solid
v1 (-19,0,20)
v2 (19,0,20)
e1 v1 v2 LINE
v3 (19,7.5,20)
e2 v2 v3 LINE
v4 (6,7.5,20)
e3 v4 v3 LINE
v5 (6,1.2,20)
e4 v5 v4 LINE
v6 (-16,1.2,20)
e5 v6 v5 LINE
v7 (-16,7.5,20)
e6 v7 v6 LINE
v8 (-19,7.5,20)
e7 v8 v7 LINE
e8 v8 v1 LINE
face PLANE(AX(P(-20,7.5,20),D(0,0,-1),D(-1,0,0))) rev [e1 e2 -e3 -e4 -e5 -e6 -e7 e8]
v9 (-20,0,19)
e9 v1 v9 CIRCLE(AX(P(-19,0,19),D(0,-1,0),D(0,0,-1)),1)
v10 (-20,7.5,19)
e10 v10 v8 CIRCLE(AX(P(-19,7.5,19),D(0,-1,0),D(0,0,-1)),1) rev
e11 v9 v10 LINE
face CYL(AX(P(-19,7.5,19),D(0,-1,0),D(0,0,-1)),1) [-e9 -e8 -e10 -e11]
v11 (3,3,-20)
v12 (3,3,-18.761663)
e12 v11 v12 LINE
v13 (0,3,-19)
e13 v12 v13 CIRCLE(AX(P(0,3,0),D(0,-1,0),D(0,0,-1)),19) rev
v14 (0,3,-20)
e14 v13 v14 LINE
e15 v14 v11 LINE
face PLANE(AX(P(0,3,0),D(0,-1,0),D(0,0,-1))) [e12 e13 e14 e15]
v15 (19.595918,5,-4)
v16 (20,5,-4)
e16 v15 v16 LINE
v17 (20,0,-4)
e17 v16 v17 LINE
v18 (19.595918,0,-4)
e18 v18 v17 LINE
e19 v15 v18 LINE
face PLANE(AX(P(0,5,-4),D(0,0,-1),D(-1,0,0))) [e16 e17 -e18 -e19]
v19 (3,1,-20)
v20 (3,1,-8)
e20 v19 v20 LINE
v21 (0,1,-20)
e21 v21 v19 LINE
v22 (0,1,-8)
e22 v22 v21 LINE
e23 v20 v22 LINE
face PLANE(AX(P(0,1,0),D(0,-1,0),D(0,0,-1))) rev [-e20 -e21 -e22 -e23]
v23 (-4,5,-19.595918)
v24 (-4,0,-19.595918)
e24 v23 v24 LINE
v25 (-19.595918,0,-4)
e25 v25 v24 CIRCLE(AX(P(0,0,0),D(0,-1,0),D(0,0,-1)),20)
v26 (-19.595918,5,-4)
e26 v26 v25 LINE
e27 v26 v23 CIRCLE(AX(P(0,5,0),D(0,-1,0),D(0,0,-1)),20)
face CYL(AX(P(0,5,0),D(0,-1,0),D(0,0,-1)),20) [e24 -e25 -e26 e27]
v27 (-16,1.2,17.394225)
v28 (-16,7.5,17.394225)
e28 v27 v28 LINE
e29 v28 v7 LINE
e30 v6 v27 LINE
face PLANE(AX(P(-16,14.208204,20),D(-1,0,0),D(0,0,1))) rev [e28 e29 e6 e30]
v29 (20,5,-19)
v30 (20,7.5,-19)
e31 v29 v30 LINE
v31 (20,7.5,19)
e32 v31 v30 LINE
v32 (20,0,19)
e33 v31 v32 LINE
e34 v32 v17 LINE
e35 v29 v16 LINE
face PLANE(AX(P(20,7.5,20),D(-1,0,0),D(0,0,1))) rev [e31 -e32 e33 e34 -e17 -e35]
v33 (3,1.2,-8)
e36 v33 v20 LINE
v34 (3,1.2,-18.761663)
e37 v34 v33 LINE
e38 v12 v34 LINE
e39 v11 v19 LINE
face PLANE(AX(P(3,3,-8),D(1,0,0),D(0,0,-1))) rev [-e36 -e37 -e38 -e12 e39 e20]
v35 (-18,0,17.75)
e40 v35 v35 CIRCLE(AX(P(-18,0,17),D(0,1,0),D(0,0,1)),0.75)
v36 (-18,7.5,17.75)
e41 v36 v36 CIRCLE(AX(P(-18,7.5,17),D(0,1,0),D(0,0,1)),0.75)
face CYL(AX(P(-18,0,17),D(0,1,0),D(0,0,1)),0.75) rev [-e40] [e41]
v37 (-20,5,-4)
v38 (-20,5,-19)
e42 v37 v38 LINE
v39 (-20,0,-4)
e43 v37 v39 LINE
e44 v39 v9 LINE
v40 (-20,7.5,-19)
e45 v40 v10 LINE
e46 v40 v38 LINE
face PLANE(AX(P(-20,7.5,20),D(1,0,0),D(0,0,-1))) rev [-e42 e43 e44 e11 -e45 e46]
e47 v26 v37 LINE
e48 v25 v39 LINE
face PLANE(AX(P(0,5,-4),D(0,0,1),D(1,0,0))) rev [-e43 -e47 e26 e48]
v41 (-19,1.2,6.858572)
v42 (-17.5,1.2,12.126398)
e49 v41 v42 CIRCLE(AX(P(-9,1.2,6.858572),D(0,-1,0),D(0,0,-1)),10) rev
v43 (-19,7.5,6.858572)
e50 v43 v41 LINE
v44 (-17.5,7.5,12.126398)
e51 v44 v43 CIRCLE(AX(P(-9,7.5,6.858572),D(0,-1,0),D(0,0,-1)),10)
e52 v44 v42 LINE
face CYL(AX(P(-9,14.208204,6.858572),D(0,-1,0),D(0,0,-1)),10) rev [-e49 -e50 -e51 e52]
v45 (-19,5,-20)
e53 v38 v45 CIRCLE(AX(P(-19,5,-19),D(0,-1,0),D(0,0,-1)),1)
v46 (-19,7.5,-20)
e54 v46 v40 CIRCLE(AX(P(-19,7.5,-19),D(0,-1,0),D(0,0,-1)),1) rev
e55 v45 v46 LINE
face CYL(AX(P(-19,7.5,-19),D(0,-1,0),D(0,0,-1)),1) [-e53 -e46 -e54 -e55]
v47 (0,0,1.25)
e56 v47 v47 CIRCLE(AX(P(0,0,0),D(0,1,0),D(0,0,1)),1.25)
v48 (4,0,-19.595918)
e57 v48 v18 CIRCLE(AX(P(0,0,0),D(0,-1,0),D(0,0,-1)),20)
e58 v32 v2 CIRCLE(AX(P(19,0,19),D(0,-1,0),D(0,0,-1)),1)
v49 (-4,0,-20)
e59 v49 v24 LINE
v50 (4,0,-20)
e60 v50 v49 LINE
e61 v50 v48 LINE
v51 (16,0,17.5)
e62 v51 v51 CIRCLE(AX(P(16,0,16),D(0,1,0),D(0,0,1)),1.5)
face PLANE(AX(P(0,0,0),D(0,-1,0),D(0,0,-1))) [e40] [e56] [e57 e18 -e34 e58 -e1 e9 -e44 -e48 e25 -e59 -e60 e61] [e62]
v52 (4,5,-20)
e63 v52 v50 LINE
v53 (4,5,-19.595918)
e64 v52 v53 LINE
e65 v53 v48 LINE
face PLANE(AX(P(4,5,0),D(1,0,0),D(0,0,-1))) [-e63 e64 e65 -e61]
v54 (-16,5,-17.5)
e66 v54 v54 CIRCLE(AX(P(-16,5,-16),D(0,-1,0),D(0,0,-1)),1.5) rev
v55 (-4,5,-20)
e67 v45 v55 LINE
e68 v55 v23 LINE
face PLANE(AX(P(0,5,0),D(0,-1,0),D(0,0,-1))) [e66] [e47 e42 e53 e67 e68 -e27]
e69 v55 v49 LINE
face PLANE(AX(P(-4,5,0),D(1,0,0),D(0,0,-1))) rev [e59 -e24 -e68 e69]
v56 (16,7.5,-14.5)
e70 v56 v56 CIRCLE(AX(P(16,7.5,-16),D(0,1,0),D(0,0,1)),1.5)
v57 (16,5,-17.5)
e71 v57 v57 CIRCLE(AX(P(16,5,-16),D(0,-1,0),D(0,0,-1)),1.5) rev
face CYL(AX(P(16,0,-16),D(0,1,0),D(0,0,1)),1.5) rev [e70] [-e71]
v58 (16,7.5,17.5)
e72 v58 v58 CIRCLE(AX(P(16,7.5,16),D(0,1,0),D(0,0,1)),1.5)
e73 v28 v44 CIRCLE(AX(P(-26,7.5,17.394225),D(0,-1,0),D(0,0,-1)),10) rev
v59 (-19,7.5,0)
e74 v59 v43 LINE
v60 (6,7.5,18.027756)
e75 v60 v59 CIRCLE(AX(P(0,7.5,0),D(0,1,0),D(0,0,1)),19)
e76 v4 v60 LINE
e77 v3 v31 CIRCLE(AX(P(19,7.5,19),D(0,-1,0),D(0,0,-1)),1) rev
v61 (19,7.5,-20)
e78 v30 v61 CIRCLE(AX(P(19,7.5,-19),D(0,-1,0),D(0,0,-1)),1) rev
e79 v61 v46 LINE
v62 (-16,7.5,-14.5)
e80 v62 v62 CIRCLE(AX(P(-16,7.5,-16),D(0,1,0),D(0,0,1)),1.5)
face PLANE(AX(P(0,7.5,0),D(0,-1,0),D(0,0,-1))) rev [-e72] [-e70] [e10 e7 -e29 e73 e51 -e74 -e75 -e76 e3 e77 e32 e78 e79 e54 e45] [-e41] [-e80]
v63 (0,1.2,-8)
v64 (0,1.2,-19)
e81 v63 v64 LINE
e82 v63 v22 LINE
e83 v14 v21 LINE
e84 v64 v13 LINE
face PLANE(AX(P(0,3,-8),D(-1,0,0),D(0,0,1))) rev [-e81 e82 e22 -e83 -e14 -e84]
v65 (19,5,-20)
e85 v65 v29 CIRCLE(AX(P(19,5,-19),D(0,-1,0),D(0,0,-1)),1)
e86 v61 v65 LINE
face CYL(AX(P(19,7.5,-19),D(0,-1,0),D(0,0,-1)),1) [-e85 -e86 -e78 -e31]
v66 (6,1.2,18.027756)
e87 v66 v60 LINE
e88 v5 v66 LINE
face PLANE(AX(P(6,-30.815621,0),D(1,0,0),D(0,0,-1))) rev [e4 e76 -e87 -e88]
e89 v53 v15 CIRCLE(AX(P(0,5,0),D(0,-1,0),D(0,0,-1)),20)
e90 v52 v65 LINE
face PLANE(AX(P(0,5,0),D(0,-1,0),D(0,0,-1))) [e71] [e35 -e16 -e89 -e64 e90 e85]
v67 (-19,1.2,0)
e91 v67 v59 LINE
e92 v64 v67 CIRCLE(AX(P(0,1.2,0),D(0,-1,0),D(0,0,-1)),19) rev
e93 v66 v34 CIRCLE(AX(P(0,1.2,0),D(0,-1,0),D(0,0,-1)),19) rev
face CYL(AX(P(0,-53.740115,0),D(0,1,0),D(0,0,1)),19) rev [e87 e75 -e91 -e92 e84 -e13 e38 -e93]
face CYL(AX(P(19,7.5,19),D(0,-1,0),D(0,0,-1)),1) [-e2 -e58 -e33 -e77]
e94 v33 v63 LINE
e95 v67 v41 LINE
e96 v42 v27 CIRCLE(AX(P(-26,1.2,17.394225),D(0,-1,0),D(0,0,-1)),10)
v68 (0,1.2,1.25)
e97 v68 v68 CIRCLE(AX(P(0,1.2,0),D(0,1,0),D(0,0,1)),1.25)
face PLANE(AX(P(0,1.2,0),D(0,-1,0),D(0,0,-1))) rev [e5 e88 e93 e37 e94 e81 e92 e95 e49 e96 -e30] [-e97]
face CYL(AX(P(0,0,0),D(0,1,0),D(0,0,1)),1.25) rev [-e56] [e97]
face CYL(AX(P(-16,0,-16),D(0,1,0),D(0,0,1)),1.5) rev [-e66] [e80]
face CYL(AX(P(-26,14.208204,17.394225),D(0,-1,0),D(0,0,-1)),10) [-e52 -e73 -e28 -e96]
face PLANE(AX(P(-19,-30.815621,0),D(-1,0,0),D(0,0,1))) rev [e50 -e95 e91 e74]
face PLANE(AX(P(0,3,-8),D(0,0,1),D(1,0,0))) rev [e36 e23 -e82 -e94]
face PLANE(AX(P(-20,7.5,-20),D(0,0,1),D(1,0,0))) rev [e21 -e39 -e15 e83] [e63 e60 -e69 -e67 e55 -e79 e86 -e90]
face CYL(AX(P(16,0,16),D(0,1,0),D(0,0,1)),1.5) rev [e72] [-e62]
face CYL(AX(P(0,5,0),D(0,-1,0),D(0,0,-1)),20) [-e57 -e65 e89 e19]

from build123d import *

# Parameters (mm, degrees)
SKETCH1_W               = 40
SKETCH1_H               = 40
BOSS_EXTRUDE1_DEPTH     = 7.5
SKETCH2_R               = 19
CUT_EXTRUDE1_DEPTH      = 6.3
SKETCH3_W               = 25
SKETCH3_H               = 20
CUT_EXTRUDE2_DEPTH      = 6.3
SKETCH4_R               = 1.5
CUT_EXTRUDE3_DEPTH      = 30.261749777
SKETCH6_R               = 1.25
CUT_EXTRUDE5_DEPTH      = 29.977404991
SKETCH7_W               = 3
SKETCH7_H               = 6
BOSS_EXTRUDE2_DEPTH     = 6.3
FILLET1_R               = 10
FILLET2_R               = 10
SKETCH8_R               = 0.75
CUT_EXTRUDE6_DEPTH      = 30.261749777
BOSS_EXTRUDE3_DEPTH     = 5
FILLET3_R               = 1
CUT_EXTRUDE7_START      = -1
SKETCH10_W              = 3
SKETCH10_H              = 12
CUT_EXTRUDE7_DEPTH      = 2
CUT_EXTRUDE8_DEPTH      = 33.882366095
CUT_EXTRUDE8_DEPTH_BACK = 33.882366095
SKETCH11_W              = 5
SKETCH11_H              = 7.5
CUT_EXTRUDE9_START      = -5
SKETCH12_R              = 1.5
CUT_EXTRUDE9_DEPTH      = 5


with BuildPart() as part:
    # Sketch1 → Boss-Extrude1 (new body)
    with BuildSketch(Plane(origin=(0, 0, 0), x_dir=(1, 0, 0), z_dir=(0, 1, 0))):
        Rectangle(SKETCH1_W, SKETCH1_H)
    extrude(amount=BOSS_EXTRUDE1_DEPTH)

    # Sketch2 → Cut-Extrude1 (cut)
    with BuildSketch(Plane(origin=(0, 7.5, 0), x_dir=(1, 0, 0), z_dir=(0, 1, 0))):
        with Locations(Location((0, 0, 0), (0, 0, 270))):
            Circle(SKETCH2_R)
    extrude(amount=-CUT_EXTRUDE1_DEPTH, mode=Mode.SUBTRACT)

    # Sketch3 → Cut-Extrude2 (cut)
    with BuildSketch(Plane(origin=(0, 7.5, 0), x_dir=(1, 0, 0), z_dir=(0, 1, 0))):
        with Locations((-6.5, -10)):
            Rectangle(SKETCH3_W, SKETCH3_H)
    extrude(amount=-CUT_EXTRUDE2_DEPTH, mode=Mode.SUBTRACT)

    # Sketch4 → Cut-Extrude3 (cut, through all)
    with BuildSketch(Plane(origin=(0, 7.5, 0), x_dir=(1, 0, 0), z_dir=(0, 1, 0))):
        with Locations(Location((-16, 16, 0), (0, 0, 270))):
            Circle(SKETCH4_R)
        with Locations(Location((16, 16, 0), (0, 0, 270))):
            Circle(SKETCH4_R)
        with Locations(Location((16, -16, 0), (0, 0, 270))):
            Circle(SKETCH4_R)
    extrude(amount=-CUT_EXTRUDE3_DEPTH, mode=Mode.SUBTRACT)

    # Sketch6 → Cut-Extrude5 (cut, through all)
    with BuildSketch(Plane(origin=(0, 1.2, 0), x_dir=(1, 0, 0), z_dir=(0, 1, 0))):
        with Locations(Location((0, 0, 0), (0, 0, 270))):
            Circle(SKETCH6_R)
    extrude(amount=-CUT_EXTRUDE5_DEPTH, mode=Mode.SUBTRACT)

    # Sketch7 → Boss-Extrude2 (add)
    with BuildSketch(Plane(origin=(0, 1.2, 0), x_dir=(1, 0, 0), z_dir=(0, 1, 0))):
        with Locations((-17.5, -17)):
            Rectangle(SKETCH7_W, SKETCH7_H)
    extrude(amount=BOSS_EXTRUDE2_DEPTH)

    # Fillet1
    # the kernel refuses this fillet: 10 mm, written as the material it adds along each edge
    with BuildSketch(Plane(origin=(-19, 1.2, 14), x_dir=(0, 0, -1), z_dir=(0, 1, 0))) as fillet1_piece_1:
        with BuildLine():
            CenterArc((7.141428429, -10), FILLET1_R, 90, 45.572995999)
            Line((0, -3), (-0.142828569, -2.86))
            ThreePointArc((-0.142828569, -2.86), (-0.2, -1.5), (-0.2, 0))
            Line((-0.2, 0), (0, 0.2))
            Line((0, 0.2), (7.141428429, 0.2))
            Line((7.141428429, 0.2), (7.141428429, 0))
        make_face()
    extrude(amount=6.3)

    # Fillet2
    fillet2_edges = [part.edges().sort_by_distance(p)[0] for p in [
        (-16, 4.35, 14),
    ]]
    fillet(fillet2_edges, radius=FILLET2_R)

    # Sketch8 → Cut-Extrude6 (cut, through all)
    with BuildSketch(Plane(origin=(0, 7.5, 0), x_dir=(1, 0, 0), z_dir=(0, 1, 0))):
        with Locations(Location((-18, -17, 0), (0, 0, 270))):
            Circle(SKETCH8_R)
    extrude(amount=-CUT_EXTRUDE6_DEPTH, mode=Mode.SUBTRACT)

    # Sketch9 → Boss-Extrude3 (add)
    with BuildSketch(Plane.XY.offset(20)):
        Polygon((-18, 7.5), (-16, 7.5), (-16, 1.2), (6, 1.2), (6, 7.5), (8, 7.5), (8, 0), (-18, 0), align=None)
    extrude(amount=BOSS_EXTRUDE3_DEPTH)

    # Fillet3
    fillet3_edges = [part.edges().sort_by_distance(p)[0] for p in [
        (20, 3.75, 20),
        (-20, 3.75, 20),
        (-20, 3.75, -20),
        (20, 3.75, -20),
    ]]
    fillet(fillet3_edges, radius=FILLET3_R)

    # Sketch10 → Cut-Extrude7 (cut)
    with BuildSketch(Plane.XZ.offset(CUT_EXTRUDE7_START)):
        with Locations((1.5, -14)):
            Rectangle(SKETCH10_W, SKETCH10_H)
    extrude(amount=-CUT_EXTRUDE7_DEPTH, mode=Mode.SUBTRACT)

    # Sketch11 → Cut-Extrude8 (cut, two sides: drawn at the far end of the back side and taken through both)
    with BuildSketch(Plane(origin=(0, 0, 0), x_dir=(0, 0, -1), z_dir=(1, 0, 0)).offset(-CUT_EXTRUDE8_DEPTH_BACK)):
        with Locations((-22.5, 3.75)):
            Rectangle(SKETCH11_W, SKETCH11_H)
    extrude(amount=CUT_EXTRUDE8_DEPTH + CUT_EXTRUDE8_DEPTH_BACK, mode=Mode.SUBTRACT)

    # Sketch12 → Cut-Extrude9 (cut)
    # profile 1 of 2: a face of its own
    with BuildSketch(Plane.XZ.offset(CUT_EXTRUDE9_START)):
        with BuildLine():
            Line((20, -4), (19.595917942, -4))
            ThreePointArc((19.595917942, -4), (14.142135624, -14.142135624), (4, -19.595917942))
            Line((4, -19.595917942), (4, -20))
            Line((4, -20), (19, -20))
            ThreePointArc((19, -20), (19.707106781, -19.707106781), (20, -19))
            Line((20, -19), (20, -4))
        make_face()
        with Locations(Location((16, -16, 0), (0, 0, 90))):
            Circle(SKETCH12_R, mode=Mode.SUBTRACT)
    # profile 2 of 2: a face of its own
    with BuildSketch(Plane.XZ.offset(CUT_EXTRUDE9_START)):
        with BuildLine():
            Line((-4, -20), (-4, -19.595917942))
            ThreePointArc((-4, -19.595917942), (-14.142135624, -14.142135624), (-19.595917942, -4))
            Line((-19.595917942, -4), (-20, -4))
            Line((-20, -4), (-20, -19))
            ThreePointArc((-20, -19), (-19.707106781, -19.707106781), (-19, -20))
            Line((-19, -20), (-4, -20))
        make_face()
        with Locations(Location((-16, -16, 0), (0, 0, 90))):
            Circle(SKETCH12_R, mode=Mode.SUBTRACT)
    extrude(amount=CUT_EXTRUDE9_DEPTH, mode=Mode.SUBTRACT)


solid = part.part
